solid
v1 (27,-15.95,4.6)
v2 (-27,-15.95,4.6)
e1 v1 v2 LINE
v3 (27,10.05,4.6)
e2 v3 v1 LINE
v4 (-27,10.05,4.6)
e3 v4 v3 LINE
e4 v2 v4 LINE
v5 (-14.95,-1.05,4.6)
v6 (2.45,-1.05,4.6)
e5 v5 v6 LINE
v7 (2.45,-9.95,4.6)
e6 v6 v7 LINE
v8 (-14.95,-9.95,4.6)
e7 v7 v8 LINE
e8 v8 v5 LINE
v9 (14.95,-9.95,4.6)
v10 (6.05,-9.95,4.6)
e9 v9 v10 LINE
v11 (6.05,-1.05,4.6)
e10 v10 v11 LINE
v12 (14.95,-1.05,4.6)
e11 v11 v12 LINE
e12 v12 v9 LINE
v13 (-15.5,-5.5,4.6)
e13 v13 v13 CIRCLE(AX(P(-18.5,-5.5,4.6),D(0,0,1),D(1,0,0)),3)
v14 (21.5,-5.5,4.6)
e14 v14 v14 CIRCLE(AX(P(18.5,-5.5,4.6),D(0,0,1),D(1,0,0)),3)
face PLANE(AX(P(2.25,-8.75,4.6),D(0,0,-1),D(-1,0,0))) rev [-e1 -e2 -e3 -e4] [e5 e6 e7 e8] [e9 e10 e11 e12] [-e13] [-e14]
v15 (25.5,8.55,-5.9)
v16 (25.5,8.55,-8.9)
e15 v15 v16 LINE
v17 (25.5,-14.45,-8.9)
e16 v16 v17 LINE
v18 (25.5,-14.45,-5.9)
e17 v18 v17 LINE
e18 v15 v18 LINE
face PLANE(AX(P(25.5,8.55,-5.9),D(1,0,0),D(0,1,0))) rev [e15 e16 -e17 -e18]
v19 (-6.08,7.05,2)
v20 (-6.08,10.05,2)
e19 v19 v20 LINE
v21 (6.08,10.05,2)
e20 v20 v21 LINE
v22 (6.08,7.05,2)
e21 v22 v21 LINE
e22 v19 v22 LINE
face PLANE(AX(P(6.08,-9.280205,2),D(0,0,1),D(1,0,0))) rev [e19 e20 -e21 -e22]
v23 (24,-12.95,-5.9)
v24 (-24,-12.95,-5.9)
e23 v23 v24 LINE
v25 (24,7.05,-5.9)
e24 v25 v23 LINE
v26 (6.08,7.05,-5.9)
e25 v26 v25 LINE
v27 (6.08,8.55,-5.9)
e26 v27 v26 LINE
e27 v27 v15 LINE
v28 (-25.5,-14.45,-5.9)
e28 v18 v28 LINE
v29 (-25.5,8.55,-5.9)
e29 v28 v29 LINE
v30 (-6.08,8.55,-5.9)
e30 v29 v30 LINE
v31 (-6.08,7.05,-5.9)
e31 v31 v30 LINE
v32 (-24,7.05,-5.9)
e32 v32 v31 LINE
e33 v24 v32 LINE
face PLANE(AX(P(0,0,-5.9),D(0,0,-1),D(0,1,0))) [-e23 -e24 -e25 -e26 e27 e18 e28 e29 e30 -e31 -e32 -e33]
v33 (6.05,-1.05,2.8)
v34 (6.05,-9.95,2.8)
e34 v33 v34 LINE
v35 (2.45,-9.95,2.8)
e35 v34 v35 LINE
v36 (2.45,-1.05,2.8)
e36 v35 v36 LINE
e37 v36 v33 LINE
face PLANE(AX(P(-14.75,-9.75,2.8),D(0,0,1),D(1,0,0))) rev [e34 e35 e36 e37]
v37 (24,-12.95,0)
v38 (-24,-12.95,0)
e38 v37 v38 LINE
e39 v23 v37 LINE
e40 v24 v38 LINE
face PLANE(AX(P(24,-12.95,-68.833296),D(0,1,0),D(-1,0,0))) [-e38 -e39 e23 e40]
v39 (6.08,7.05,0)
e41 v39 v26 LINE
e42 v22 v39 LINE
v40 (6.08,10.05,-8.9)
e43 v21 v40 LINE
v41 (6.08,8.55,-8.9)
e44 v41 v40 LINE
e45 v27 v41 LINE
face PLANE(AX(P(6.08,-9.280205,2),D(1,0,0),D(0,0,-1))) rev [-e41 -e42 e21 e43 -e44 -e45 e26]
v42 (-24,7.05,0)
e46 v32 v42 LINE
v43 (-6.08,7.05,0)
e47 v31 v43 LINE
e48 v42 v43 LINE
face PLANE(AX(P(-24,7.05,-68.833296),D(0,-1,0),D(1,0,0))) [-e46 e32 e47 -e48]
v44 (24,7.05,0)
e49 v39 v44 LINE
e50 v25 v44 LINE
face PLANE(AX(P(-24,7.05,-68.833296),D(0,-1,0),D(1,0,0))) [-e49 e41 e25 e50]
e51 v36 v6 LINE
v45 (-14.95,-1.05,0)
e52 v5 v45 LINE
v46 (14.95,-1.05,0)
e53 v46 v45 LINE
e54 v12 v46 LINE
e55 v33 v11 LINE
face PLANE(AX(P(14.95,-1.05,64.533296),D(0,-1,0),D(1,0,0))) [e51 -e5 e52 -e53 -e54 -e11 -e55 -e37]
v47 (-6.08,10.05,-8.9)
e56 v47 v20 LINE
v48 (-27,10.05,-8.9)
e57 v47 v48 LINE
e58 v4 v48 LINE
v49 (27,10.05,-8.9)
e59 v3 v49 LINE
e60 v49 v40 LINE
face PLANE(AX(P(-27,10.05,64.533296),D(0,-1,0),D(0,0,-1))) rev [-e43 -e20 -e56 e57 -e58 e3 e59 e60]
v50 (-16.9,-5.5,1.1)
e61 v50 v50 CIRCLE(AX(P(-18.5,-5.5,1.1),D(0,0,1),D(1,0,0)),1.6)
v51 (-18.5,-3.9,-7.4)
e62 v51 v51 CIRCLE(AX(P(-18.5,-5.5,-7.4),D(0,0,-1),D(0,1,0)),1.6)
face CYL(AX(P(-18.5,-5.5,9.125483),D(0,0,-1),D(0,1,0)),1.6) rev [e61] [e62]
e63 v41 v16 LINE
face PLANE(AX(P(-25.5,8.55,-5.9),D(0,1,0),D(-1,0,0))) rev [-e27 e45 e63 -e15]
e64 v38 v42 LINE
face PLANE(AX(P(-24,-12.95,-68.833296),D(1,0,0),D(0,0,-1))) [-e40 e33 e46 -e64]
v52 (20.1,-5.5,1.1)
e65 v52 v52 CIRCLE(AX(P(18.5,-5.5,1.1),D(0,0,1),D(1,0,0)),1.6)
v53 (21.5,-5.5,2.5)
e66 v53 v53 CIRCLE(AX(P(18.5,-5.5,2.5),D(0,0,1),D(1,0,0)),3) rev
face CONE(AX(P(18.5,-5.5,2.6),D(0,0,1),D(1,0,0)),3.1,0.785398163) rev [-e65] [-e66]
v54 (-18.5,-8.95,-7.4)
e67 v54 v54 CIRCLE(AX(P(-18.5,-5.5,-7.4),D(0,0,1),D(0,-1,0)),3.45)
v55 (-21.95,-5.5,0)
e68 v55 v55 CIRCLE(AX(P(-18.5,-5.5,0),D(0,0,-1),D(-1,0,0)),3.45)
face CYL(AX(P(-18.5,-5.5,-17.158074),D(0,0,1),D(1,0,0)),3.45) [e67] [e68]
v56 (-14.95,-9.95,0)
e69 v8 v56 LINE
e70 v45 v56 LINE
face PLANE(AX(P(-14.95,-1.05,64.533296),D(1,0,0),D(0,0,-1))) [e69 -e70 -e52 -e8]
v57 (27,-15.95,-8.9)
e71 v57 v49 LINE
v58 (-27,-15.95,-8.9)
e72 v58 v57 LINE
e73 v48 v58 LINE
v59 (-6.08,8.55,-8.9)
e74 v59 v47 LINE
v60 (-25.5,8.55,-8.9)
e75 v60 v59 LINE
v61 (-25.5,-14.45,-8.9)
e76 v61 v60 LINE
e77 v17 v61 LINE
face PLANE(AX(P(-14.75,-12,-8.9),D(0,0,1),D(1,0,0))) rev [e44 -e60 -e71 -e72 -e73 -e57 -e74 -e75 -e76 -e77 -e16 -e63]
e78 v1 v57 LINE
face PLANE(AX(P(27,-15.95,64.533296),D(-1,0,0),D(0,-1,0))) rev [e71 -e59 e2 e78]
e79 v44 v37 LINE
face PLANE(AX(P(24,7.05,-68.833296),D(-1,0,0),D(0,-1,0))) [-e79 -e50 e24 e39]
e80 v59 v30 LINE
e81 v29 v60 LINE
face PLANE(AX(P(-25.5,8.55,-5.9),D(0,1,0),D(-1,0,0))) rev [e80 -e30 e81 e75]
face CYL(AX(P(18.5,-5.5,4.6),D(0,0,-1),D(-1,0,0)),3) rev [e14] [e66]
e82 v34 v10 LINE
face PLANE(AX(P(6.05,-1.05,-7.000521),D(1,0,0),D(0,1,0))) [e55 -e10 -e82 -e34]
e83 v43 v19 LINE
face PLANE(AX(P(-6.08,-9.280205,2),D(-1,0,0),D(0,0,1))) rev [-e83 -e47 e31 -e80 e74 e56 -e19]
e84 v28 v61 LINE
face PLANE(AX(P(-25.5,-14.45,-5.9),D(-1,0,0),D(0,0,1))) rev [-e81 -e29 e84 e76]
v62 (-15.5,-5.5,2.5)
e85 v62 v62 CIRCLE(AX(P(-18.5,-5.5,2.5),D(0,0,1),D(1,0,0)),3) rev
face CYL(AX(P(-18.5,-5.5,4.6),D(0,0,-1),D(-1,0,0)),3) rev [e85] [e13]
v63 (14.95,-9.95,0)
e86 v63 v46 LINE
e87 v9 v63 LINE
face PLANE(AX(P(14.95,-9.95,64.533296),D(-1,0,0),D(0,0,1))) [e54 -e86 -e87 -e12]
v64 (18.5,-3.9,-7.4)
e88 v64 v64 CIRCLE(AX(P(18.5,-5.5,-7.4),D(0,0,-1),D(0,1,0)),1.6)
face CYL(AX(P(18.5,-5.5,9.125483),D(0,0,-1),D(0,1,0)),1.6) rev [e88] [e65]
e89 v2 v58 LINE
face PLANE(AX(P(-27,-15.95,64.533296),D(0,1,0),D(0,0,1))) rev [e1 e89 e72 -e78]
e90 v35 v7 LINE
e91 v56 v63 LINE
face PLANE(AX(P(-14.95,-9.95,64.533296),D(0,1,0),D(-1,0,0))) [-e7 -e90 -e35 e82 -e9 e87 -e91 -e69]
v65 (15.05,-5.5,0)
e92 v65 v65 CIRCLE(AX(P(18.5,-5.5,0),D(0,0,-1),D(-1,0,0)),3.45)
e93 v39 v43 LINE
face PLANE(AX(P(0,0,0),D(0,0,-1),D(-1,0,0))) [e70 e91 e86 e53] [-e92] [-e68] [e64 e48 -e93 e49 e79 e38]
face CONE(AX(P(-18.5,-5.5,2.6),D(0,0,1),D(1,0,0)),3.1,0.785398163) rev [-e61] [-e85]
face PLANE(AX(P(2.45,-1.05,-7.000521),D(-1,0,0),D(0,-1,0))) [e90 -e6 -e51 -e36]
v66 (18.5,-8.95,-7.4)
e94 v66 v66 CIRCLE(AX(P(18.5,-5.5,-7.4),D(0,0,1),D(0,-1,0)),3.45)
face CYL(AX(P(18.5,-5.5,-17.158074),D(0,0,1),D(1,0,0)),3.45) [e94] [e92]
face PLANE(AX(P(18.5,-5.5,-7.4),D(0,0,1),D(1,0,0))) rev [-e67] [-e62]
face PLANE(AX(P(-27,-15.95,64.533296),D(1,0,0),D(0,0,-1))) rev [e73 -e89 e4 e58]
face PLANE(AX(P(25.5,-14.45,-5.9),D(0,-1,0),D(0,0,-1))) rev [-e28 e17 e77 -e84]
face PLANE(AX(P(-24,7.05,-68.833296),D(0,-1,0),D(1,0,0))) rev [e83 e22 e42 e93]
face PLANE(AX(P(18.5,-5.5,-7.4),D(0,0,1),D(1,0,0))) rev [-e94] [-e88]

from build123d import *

# Parameters (mm, degrees)
SKETCH1_W           = 54
SKETCH1_H           = 26
SKETCH1_W_2         = 29.9
SKETCH1_H_2         = 8.9
BOSS_EXTRUDE1_DEPTH = 4.6
SKETCH2_W           = 3.6
SKETCH2_H           = 8.9
BOSS_EXTRUDE2_DEPTH = 1.8
SKETCH3_R           = 3.45
BOSS_EXTRUDE3_DEPTH = 7.4
SKETCH4_W           = 54
SKETCH4_H           = 26
SKETCH4_W_2         = 48
SKETCH4_H_2         = 20
BOSS_EXTRUDE4_DEPTH = 8.9
SKETCH5_W           = 51
SKETCH5_H           = 23
SKETCH5_W_2         = 48
SKETCH5_H_2         = 20
CUT_EXTRUDE1_DEPTH  = 3
SKETCH6_R           = 1.6
CUT_EXTRUDE2_DEPTH  = 12
CUT_EXTRUDE3_REACH  = 40.525
SKETCH7_W           = 12.16
SKETCH7_H           = 10.9
SKETCH8_R           = 3
CUT_EXTRUDE4_DEPTH  = 34.401384702
CHAMFER1_SIZE       = 1.5


with BuildPart() as part:
    # Sketch1 → Boss-Extrude1 (new body)
    with BuildSketch(Plane.XY):
        with Locations((0, -2.95)):
            Rectangle(SKETCH1_W, SKETCH1_H)
        with Locations((0, -5.5)):
            Rectangle(SKETCH1_W_2, SKETCH1_H_2, mode=Mode.SUBTRACT)
    extrude(amount=BOSS_EXTRUDE1_DEPTH)

    # Sketch2 → Boss-Extrude2 (add)
    with BuildSketch(Plane.XY.offset(4.6)):
        with Locations((4.25, -5.5)):
            Rectangle(SKETCH2_W, SKETCH2_H)
    extrude(amount=-BOSS_EXTRUDE2_DEPTH)

    # Sketch3 → Boss-Extrude3 (add)
    with BuildSketch(Plane(origin=(0, 0, 0), x_dir=(-1, 0, 0), z_dir=(0, 0, -1))):
        with Locations(Location((-18.5, -5.5, 0), (0, 0, 270))):
            Circle(SKETCH3_R)
        with Locations(Location((18.5, -5.5, 0), (0, 0, 270))):
            Circle(SKETCH3_R)
    extrude(amount=BOSS_EXTRUDE3_DEPTH)

    # Sketch4 → Boss-Extrude4 (add)
    with BuildSketch(Plane(origin=(0, 0, 0), x_dir=(-1, 0, 0), z_dir=(0, 0, -1))):
        with Locations((0, -2.95)):
            Rectangle(SKETCH4_W, SKETCH4_H)
        with Locations((0, -2.95)):
            Rectangle(SKETCH4_W_2, SKETCH4_H_2, mode=Mode.SUBTRACT)
    extrude(amount=BOSS_EXTRUDE4_DEPTH)

    # Sketch5 → Cut-Extrude1 (cut)
    with BuildSketch(Plane(origin=(0, 0, -8.9), x_dir=(-1, 0, 0), z_dir=(0, 0, -1))):
        with Locations((0, -2.95)):
            Rectangle(SKETCH5_W, SKETCH5_H)
        with Locations((0, -2.95)):
            Rectangle(SKETCH5_W_2, SKETCH5_H_2, mode=Mode.SUBTRACT)
    extrude(amount=-CUT_EXTRUDE1_DEPTH, mode=Mode.SUBTRACT)

    # Sketch6 → Cut-Extrude2 (cut)
    with BuildSketch(Plane(origin=(0, 0, -7.4), x_dir=(-1, 0, 0), z_dir=(0, 0, -1))):
        with Locations(Location((-18.5, -5.5, 0), (0, 0, 90))):
            Circle(SKETCH6_R)
        with Locations(Location((18.5, -5.5, 0), (0, 0, 90))):
            Circle(SKETCH6_R)
    extrude(amount=-CUT_EXTRUDE2_DEPTH, mode=Mode.SUBTRACT)

    # Cut-Extrude3: up to this face of the body (flat: up to its plane)
    cut_extrude3_end = Plane(part.part.faces().sort_by_distance((0, 7.05, -2.95))[0])
    # Sketch7 → Cut-Extrude3 (cut, up to the picked face)
    with BuildSketch(Plane(origin=(0, 10.05, 0), x_dir=(1, 0, 0), z_dir=(0, 1, 0)), mode=Mode.PRIVATE) as cut_extrude3_sk1:
        with Locations((0, 3.45)):
            Rectangle(SKETCH7_W, SKETCH7_H)
    cut_extrude3_tool1 = split(extrude(cut_extrude3_sk1.sketch, amount=-CUT_EXTRUDE3_REACH, mode=Mode.PRIVATE), bisect_by=cut_extrude3_end, keep=Keep.BOTH, mode=Mode.PRIVATE)
    add(cut_extrude3_tool1.solids().sort_by(Axis((0, 10.05, -3.45), (0, -1, 0)))[0], mode=Mode.SUBTRACT)

    # Sketch8 → Cut-Extrude4 (cut, through all)
    with BuildSketch(Plane.XY.offset(2.6)):
        with Locations((-18.5, -5.5)):
            Circle(SKETCH8_R)
        with Locations((18.5, -5.5)):
            Circle(SKETCH8_R)
    extrude(amount=CUT_EXTRUDE4_DEPTH, mode=Mode.SUBTRACT)

    # Chamfer1
    # the kernel refuses this chamfer: 1.5 mm, written as the material it takes off along each edge
    with BuildSketch(Plane(origin=(-18.5, -5.5, 2.6), x_dir=(0, 1, 0), z_dir=(-1, 0, 0))) as chamfer1_piece_1_section:
        Polygon((1.6 + CHAMFER1_SIZE, 0), (1.6, CHAMFER1_SIZE), (1.6, 0), align=None)
    chamfer1_piece_1 = revolve(axis=Axis((-18.5, -5.5, 2.6), (0, 0, -1)), mode=Mode.PRIVATE)
    chamfer1_piece_1 = chamfer1_piece_1 & Plane(origin=(-18.5, -5.5, 1.79661682), x_dir=(1, 0, 0), z_dir=(0, 0, -1)) * Cylinder(3, 13, mode=Mode.PRIVATE)
    add(chamfer1_piece_1, mode=Mode.SUBTRACT)
    with BuildSketch(Plane(origin=(18.5, -5.5, 2.6), x_dir=(0, 1, 0), z_dir=(-1, 0, 0))) as chamfer1_piece_2_section:
        Polygon((1.6 + CHAMFER1_SIZE, 0), (1.6, CHAMFER1_SIZE), (1.6, 0), align=None)
    chamfer1_piece_2 = revolve(axis=Axis((18.5, -5.5, 2.6), (0, 0, -1)), mode=Mode.PRIVATE)
    chamfer1_piece_2 = chamfer1_piece_2 & Plane(origin=(18.5, -5.5, 1.79661682), x_dir=(1, 0, 0), z_dir=(0, 0, -1)) * Cylinder(3, 13, mode=Mode.PRIVATE)
    add(chamfer1_piece_2, mode=Mode.SUBTRACT)


solid = part.part
